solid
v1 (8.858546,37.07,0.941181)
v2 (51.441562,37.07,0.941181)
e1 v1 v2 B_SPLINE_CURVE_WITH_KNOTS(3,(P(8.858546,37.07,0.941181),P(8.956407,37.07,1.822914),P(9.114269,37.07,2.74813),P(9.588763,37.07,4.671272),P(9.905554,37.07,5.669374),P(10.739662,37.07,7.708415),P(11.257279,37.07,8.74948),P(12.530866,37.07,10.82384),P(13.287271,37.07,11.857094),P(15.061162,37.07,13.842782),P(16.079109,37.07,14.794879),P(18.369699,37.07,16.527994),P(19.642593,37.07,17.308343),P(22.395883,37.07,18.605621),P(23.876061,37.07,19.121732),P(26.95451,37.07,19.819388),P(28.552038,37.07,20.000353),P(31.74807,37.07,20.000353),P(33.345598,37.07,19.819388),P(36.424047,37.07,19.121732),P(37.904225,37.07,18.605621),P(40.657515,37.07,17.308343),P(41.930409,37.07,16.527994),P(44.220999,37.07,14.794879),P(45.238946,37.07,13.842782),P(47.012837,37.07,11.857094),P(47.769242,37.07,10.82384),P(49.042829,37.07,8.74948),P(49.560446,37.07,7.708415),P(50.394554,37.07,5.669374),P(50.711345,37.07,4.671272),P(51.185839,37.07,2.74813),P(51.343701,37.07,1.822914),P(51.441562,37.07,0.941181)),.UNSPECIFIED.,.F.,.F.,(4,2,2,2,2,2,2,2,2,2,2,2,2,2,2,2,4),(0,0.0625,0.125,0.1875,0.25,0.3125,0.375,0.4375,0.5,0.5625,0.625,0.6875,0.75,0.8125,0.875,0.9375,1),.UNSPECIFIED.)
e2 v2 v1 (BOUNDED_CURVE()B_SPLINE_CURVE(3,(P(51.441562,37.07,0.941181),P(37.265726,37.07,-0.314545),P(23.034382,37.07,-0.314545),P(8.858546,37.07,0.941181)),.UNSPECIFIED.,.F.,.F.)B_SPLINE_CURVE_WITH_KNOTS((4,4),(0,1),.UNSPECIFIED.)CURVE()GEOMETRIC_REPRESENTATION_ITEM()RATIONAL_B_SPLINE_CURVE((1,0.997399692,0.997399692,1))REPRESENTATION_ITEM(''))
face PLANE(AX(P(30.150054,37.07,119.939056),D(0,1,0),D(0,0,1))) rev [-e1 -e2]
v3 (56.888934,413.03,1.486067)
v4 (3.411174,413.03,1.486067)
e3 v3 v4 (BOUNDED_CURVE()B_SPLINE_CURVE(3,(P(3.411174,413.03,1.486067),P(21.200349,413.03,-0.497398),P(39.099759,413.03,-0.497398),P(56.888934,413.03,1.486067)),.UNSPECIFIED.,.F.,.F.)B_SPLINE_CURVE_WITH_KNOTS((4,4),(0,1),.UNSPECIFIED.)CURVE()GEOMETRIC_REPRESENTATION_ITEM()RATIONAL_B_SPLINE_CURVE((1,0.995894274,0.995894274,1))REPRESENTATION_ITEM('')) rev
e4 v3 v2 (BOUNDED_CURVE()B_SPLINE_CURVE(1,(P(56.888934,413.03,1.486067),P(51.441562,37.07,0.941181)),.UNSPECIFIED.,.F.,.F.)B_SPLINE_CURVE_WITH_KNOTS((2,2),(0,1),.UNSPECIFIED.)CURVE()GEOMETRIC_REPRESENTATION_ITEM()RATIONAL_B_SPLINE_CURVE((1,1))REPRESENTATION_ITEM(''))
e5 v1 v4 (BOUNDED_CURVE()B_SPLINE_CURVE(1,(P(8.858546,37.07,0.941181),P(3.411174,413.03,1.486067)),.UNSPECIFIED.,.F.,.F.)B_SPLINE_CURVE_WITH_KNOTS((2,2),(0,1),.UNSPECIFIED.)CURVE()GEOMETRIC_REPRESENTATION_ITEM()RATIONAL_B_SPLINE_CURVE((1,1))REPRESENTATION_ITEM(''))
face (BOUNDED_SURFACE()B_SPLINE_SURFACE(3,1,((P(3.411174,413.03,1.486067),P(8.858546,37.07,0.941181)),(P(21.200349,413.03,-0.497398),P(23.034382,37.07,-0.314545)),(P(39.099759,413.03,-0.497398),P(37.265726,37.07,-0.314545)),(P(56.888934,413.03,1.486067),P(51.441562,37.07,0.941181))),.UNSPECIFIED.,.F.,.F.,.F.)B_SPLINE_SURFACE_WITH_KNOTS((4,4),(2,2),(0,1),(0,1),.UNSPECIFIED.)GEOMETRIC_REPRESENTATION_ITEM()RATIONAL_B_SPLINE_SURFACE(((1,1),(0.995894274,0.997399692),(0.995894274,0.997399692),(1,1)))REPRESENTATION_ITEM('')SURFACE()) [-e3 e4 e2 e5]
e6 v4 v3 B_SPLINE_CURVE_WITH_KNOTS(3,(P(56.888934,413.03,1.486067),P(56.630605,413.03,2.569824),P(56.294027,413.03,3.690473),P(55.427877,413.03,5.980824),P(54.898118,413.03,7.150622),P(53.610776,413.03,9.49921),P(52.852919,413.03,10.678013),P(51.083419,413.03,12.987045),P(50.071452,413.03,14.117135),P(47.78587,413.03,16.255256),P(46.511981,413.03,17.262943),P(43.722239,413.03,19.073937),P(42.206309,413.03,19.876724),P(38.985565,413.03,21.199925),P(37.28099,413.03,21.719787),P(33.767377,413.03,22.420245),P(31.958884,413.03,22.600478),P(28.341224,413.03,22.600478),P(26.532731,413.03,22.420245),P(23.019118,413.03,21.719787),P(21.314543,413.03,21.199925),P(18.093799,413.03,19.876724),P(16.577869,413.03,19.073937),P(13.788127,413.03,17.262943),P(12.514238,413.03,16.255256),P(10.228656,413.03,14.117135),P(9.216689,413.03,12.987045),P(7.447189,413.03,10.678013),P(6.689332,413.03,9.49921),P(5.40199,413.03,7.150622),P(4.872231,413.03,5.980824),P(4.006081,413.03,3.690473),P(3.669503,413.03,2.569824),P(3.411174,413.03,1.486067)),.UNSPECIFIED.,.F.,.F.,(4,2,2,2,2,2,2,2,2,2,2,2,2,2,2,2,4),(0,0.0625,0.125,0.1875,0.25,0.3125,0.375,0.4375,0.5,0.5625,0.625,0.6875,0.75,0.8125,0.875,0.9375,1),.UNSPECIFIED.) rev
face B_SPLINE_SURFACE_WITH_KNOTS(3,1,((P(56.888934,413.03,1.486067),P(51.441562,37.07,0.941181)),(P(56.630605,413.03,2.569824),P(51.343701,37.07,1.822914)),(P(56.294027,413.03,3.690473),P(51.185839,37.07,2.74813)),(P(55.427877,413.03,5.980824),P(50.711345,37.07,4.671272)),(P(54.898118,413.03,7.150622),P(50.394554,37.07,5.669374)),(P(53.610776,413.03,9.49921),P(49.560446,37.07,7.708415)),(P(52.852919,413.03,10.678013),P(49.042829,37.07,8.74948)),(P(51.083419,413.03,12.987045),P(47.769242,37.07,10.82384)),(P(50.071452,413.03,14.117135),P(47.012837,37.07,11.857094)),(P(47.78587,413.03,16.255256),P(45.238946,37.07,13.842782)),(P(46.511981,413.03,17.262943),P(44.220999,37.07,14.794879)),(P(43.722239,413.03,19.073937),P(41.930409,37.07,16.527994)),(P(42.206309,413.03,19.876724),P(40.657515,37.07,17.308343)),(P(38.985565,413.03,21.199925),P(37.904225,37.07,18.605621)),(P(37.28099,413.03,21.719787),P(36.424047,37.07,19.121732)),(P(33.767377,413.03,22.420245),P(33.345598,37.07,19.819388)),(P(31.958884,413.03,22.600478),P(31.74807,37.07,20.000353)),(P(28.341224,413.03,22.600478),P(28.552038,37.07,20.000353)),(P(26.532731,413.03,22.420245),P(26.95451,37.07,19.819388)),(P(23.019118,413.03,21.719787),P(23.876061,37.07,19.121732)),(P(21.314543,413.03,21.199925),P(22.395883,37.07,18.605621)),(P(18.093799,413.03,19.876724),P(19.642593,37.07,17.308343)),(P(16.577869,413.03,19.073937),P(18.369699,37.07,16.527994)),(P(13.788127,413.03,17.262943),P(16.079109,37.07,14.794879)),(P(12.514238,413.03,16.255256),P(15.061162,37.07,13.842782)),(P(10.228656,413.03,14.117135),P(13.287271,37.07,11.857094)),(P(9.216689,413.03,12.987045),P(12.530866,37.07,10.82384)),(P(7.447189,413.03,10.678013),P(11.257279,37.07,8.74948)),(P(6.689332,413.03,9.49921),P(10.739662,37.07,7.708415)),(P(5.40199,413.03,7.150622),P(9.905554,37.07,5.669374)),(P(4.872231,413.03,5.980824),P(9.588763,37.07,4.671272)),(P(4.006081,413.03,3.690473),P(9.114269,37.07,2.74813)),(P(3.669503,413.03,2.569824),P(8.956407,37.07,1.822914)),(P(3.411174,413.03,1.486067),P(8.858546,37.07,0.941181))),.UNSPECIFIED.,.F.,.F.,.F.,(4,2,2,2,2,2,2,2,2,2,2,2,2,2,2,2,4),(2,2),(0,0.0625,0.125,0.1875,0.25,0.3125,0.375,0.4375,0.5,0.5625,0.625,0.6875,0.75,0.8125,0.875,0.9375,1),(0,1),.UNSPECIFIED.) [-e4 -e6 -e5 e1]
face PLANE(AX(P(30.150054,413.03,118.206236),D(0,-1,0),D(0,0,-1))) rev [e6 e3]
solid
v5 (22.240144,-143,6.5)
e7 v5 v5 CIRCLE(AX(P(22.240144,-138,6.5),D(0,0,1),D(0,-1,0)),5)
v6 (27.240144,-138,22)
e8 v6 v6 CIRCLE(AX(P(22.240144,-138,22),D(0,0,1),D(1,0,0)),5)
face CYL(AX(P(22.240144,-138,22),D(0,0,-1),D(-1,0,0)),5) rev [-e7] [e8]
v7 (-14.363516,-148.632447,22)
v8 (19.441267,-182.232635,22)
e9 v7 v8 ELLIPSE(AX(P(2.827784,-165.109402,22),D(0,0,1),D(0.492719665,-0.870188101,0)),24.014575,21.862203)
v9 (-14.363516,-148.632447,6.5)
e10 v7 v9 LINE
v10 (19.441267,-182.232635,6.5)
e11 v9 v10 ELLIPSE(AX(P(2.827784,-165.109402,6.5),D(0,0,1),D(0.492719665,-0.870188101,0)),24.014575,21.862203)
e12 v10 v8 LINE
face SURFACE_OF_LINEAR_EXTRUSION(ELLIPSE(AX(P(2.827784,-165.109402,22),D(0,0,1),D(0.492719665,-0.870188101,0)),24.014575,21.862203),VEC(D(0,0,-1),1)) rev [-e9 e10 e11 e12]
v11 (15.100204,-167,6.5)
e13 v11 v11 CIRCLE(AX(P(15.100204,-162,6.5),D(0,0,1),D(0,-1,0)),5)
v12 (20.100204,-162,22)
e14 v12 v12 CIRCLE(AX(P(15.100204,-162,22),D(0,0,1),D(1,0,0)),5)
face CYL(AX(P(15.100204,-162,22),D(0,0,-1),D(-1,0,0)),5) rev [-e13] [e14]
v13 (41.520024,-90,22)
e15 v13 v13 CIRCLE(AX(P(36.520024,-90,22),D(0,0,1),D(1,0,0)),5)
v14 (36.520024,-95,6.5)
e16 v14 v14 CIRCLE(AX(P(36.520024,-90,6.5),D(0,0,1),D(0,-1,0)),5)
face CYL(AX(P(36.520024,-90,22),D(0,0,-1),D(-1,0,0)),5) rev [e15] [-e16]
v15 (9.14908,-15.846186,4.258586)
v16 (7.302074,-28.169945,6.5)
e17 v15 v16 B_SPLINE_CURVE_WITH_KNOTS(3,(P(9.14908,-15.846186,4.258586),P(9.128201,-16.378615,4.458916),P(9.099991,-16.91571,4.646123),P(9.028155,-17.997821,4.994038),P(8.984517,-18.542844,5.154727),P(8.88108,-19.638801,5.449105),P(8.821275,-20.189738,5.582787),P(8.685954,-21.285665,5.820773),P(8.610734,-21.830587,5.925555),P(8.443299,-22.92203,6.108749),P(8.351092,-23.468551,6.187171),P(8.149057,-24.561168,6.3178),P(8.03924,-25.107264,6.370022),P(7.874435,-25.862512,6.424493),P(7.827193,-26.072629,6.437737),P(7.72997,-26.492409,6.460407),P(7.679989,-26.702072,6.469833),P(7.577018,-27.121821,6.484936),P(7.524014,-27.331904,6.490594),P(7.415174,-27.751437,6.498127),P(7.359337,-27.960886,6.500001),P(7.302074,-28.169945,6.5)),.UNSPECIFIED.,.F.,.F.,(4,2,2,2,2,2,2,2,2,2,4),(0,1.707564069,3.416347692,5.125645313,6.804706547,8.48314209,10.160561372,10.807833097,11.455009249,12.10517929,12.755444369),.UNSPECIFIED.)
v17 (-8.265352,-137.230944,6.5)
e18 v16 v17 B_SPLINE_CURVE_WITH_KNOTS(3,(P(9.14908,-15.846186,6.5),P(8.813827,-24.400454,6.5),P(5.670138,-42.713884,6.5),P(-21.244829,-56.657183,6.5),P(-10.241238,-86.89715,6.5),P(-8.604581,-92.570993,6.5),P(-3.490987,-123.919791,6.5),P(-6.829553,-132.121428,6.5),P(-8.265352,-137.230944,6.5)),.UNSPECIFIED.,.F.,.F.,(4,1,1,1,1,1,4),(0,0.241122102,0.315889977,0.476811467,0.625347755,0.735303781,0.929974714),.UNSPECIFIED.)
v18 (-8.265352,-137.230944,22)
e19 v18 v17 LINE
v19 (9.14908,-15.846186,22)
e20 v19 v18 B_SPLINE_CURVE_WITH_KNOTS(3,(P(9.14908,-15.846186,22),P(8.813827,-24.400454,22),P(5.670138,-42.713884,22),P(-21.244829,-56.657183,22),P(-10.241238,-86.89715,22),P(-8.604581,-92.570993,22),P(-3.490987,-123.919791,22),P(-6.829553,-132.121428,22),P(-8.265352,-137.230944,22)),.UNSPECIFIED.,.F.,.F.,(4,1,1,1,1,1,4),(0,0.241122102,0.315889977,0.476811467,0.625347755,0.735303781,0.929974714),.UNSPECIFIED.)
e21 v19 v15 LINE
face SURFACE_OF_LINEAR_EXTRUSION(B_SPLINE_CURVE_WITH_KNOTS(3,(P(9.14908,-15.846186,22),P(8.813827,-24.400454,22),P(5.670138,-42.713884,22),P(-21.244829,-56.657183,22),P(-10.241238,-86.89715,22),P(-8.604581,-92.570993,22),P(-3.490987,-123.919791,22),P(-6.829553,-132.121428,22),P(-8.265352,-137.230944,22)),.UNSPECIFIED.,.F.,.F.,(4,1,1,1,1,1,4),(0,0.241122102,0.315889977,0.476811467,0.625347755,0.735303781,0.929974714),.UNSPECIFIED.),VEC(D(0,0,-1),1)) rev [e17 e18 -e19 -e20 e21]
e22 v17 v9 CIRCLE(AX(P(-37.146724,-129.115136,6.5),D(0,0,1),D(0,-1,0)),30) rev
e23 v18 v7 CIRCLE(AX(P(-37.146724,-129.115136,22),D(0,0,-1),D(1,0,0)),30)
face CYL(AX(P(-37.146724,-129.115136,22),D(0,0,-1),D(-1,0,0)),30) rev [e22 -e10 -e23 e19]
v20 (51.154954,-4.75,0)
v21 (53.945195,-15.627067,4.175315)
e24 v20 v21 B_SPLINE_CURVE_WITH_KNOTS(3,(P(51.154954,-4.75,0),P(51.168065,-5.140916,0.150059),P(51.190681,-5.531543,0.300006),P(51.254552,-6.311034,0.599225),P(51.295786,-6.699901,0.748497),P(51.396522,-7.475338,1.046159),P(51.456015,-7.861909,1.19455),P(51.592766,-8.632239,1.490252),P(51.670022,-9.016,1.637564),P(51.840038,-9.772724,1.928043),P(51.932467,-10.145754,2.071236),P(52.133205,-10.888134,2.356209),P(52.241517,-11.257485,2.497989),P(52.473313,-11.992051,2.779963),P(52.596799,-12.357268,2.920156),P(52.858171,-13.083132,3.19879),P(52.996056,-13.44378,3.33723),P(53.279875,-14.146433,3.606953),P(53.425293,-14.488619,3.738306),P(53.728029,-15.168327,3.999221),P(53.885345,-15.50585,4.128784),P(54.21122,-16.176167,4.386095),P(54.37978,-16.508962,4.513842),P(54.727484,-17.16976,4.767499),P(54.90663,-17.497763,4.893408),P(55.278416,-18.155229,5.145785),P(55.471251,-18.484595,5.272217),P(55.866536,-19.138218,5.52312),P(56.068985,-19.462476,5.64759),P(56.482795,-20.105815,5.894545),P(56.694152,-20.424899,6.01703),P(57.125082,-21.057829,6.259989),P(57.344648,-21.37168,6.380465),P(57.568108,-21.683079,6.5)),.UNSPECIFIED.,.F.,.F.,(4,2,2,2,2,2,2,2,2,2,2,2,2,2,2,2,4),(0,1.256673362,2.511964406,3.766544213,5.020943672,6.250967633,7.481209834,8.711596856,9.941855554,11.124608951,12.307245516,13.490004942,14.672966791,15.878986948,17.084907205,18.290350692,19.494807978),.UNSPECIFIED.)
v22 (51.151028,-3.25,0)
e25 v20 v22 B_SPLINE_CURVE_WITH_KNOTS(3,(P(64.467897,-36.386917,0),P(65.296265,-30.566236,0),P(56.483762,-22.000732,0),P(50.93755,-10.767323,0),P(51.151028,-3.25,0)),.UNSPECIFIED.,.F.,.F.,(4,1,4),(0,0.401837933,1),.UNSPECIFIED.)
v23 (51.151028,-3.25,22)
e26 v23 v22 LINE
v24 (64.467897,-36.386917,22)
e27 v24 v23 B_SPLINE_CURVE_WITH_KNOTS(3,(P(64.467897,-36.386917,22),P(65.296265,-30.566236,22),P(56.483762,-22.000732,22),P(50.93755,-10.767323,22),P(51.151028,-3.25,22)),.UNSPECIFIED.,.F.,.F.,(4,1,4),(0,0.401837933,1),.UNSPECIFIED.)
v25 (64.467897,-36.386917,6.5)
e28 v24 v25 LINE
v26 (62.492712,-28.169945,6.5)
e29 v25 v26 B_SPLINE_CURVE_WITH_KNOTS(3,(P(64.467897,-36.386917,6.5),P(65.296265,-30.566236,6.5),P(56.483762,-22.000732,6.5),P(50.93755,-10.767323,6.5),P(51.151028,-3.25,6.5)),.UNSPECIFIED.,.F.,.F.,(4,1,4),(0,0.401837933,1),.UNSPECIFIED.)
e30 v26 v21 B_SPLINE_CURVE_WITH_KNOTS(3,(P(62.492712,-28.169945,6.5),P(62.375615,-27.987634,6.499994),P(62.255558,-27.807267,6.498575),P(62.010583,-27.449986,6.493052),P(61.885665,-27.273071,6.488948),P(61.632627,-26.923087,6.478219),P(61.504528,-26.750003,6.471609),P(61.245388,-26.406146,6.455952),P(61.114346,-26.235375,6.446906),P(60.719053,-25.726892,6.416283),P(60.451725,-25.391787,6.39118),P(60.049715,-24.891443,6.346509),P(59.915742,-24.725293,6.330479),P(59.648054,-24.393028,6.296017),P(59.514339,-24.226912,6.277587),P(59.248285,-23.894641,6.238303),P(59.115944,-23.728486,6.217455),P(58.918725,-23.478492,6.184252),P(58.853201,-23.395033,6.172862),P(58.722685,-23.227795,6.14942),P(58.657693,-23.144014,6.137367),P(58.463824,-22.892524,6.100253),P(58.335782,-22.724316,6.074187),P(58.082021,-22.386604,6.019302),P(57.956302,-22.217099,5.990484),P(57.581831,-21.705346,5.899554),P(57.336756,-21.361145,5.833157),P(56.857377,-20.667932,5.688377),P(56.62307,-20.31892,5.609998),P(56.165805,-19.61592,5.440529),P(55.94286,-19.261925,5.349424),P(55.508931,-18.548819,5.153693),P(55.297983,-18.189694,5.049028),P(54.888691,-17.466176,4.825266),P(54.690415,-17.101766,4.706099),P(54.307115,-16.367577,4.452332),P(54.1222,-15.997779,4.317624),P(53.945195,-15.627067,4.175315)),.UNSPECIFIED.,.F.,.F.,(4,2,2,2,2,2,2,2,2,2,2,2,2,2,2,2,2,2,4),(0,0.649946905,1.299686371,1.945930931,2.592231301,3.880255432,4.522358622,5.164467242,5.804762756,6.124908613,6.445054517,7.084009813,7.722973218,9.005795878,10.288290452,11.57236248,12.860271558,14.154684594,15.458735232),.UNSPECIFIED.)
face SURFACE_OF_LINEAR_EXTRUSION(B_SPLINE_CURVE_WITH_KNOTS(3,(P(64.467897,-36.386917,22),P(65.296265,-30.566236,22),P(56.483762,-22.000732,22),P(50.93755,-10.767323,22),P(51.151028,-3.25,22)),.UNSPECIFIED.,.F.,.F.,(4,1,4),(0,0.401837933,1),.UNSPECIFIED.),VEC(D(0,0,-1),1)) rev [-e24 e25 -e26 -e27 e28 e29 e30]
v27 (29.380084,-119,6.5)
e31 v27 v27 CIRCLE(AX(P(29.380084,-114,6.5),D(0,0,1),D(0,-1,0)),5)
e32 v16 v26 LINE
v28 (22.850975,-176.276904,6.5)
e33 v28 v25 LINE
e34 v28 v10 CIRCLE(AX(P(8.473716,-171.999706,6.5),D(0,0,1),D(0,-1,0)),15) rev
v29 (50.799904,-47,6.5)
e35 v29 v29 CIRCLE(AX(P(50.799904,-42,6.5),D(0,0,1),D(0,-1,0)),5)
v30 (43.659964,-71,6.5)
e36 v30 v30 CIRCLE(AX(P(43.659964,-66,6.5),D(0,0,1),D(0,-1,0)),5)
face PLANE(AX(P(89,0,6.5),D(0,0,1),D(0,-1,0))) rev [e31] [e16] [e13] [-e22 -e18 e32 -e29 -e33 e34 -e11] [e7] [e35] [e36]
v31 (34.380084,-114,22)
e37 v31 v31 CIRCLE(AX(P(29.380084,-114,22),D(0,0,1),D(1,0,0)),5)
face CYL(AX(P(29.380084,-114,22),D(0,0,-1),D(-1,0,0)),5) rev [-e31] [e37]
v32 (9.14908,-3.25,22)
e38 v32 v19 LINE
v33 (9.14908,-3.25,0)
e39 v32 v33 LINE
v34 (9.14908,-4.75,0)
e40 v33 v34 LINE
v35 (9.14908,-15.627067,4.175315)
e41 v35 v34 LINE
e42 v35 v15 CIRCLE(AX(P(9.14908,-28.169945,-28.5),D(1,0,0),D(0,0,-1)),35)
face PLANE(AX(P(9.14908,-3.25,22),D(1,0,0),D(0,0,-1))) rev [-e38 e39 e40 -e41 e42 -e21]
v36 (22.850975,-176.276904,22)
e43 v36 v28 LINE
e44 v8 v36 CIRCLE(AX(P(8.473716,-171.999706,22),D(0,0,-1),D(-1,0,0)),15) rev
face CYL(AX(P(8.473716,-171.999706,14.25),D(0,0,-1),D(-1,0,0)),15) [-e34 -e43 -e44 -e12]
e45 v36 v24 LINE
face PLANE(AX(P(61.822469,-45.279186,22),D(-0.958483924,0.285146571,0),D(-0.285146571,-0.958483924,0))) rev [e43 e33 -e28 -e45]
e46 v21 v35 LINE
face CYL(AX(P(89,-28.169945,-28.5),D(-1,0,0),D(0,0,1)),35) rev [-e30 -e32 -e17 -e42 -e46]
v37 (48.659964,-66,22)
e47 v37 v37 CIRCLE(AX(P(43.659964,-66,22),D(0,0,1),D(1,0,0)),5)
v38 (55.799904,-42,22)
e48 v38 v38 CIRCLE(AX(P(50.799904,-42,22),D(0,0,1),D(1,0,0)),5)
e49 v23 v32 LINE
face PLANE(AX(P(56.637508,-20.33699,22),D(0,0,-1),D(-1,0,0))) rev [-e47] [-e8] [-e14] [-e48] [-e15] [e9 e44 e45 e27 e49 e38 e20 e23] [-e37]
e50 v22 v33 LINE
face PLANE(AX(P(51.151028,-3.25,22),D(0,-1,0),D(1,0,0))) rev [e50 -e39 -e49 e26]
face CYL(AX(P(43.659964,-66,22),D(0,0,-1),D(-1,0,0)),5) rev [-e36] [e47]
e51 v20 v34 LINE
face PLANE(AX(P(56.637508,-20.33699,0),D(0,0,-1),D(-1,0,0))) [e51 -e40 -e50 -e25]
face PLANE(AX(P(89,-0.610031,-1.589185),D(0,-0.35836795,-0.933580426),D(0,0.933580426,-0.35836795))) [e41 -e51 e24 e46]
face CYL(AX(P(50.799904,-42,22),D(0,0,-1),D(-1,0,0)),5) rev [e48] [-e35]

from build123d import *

# Parameters (mm, degrees)
SKETCH7_R               = 5
BOSS_EXTRUDE1_DEPTH     = 22
CUT_EXTRUDE1_DEPTH      = 89
CUT_EXTRUDE1_DEPTH_BACK = 47
FILLET1_R               = 35
FILLET2_START           = 6
FILLET2_DEPTH           = 17


with BuildPart() as part:
    # Sketch4 for Loft1 → Loft1 section 0
    with BuildSketch(Plane(origin=(0, 413.03, 0), x_dir=(1, 0, 0), z_dir=(0, 1, 0))):
        with BuildLine():
            # circular arc as an exact rational Bezier (weights 1, cos(half-angle), 1)
            Bezier((3.411173818, -1.486067363), (30.150054, 1.495276154), (56.888934182, -1.486067363), weights=[1, 0.993841412, 1])
            Bezier((56.888934182, -1.486067363), (30.150054, -113.662589607), (3.411173818, -1.486067363), weights=[1, 0.231868224, 1])
        make_face()
    # Sketch2 for Loft1 → Loft1 section 1
    with BuildSketch(Plane(origin=(0, 37.07, 0), x_dir=(1, 0, 0), z_dir=(0, 1, 0))):
        with BuildLine():
            Bezier((51.441561571, -0.941181345), (30.150054, 0.944866761), (8.858546429, -0.941181345), weights=[1, 0.996099539, 1])
            Bezier((8.858546429, -0.941181345), (30.150054, -192.779980086), (51.441561571, -0.941181345), weights=[1, 0.110309138, 1])
        make_face()
    loft()


with BuildPart() as body_2:
    # Sketch7 → Boss-Extrude1 (new body)
    with BuildSketch(Plane.XY):
        with BuildLine():
            Line((61.822469128, -45.279185569), (26.122769128, -165.279185569))
            Line((26.122769128, -165.279185569), (22.169953883, -178.566071157))
            add(Edge.make_bspline(
                [(-14.363516024, -148.632447047), (-29.983708853, -166.866419634), (-10.052911221, -183.196678053), (9.877886411, -199.526936472), (22.169953883, -178.566071157)],
                knots=[3.45985968, 3.45985968, 3.45985968, 5.114245342, 5.114245342, 6.768631003, 6.768631003, 6.768631003], degree=2, weights=[1, 0.676944597, 1, 0.676944597, 1]))
            ThreePointArc((-14.363516024, -148.632447047), (-10.69288163, -143.264136434), (-8.26535198, -137.230943622))
            add(Edge.make_bspline(
                [(9.14908, -15.846186083), (8.813826518, -24.400453935), (5.670137635, -42.713883785), (-21.244829391, -56.657182906), (-10.241238044, -86.8971503), (-8.604581344, -92.570992516), (-3.490987251, -123.919790761), (-6.829553094, -132.1214282), (-8.26535198, -137.230943622)],
                knots=[0, 0, 0, 0, 0.241122102, 0.315889977, 0.476811467, 0.625347755, 0.735303781, 0.929974714, 0.929974714, 0.929974714, 0.929974714], degree=3))
            Line((9.14908, -15.846186083), (9.14908, -3.25))
            Line((9.14908, -3.25), (51.151028, -3.25))
            add(Edge.make_bspline(
                [(51.151028, -3.25), (50.937550111, -10.767323465), (56.483762161, -22.000731952), (65.296265302, -30.566236086), (64.46789676, -36.386917125)],
                knots=[0, 0, 0, 0, 0.598162067, 1, 1, 1, 1], degree=3))
            Line((64.46789676, -36.386917125), (61.822469128, -45.279185569))
        make_face()
        with Locations((50.799904, -42)):
            Circle(SKETCH7_R, mode=Mode.SUBTRACT)
        with Locations((43.659964, -66)):
            Circle(SKETCH7_R, mode=Mode.SUBTRACT)
        with Locations((36.520024, -90)):
            Circle(SKETCH7_R, mode=Mode.SUBTRACT)
        with Locations((29.380084, -114)):
            Circle(SKETCH7_R, mode=Mode.SUBTRACT)
        with Locations((22.240144, -138)):
            Circle(SKETCH7_R, mode=Mode.SUBTRACT)
        with Locations((15.100204, -162)):
            Circle(SKETCH7_R, mode=Mode.SUBTRACT)
    extrude(amount=BOSS_EXTRUDE1_DEPTH)

    # Sketch9 → Cut-Extrude1 (cut, two sides: drawn at the far end of the back side and taken through both)
    with BuildSketch(Plane(origin=(0, 0, 0), x_dir=(0, 0, -1), z_dir=(1, 0, 0)).offset(-CUT_EXTRUDE1_DEPTH_BACK)):
        Polygon((0, -4.75), (0, -188.619559547), (-6.5, -188.619559547), (-6.5, -21.683078921), align=None)
    extrude(amount=CUT_EXTRUDE1_DEPTH + CUT_EXTRUDE1_DEPTH_BACK, mode=Mode.SUBTRACT)

    # Fillet1
    fillet1_edges = [body_2.edges().sort_by_distance(p)[0] for p in [
        (33.098498215, -21.683078921, 6.5),
    ]]
    fillet(fillet1_edges, radius=FILLET1_R)

    # Fillet2: read off the stored shape, not the designer's step
    # Fillet2 outline → Fillet2 (cut)
    with BuildSketch(Plane.XY.offset(FILLET2_START)):
        with BuildLine():
            Line((22.169953883, -178.566071157), (22.850975257, -176.276904444))
            ThreePointArc((22.850975257, -176.276904444), (21.491301478, -179.452388519), (19.441266868, -182.232634909))
            add(Edge.make_bspline(
                [(19.441266868, -182.232634909), (20.998606375, -180.56349408), (22.169953883, -178.566071157)],
                knots=[6.545874557, 6.545874557, 6.545874557, 6.768631003, 6.768631003, 6.768631003], degree=2, weights=[0.92471745, 0.956501876, 1]))
        make_face()
    extrude(amount=FILLET2_DEPTH, mode=Mode.SUBTRACT)


solid = Compound([part.part, body_2.part])
